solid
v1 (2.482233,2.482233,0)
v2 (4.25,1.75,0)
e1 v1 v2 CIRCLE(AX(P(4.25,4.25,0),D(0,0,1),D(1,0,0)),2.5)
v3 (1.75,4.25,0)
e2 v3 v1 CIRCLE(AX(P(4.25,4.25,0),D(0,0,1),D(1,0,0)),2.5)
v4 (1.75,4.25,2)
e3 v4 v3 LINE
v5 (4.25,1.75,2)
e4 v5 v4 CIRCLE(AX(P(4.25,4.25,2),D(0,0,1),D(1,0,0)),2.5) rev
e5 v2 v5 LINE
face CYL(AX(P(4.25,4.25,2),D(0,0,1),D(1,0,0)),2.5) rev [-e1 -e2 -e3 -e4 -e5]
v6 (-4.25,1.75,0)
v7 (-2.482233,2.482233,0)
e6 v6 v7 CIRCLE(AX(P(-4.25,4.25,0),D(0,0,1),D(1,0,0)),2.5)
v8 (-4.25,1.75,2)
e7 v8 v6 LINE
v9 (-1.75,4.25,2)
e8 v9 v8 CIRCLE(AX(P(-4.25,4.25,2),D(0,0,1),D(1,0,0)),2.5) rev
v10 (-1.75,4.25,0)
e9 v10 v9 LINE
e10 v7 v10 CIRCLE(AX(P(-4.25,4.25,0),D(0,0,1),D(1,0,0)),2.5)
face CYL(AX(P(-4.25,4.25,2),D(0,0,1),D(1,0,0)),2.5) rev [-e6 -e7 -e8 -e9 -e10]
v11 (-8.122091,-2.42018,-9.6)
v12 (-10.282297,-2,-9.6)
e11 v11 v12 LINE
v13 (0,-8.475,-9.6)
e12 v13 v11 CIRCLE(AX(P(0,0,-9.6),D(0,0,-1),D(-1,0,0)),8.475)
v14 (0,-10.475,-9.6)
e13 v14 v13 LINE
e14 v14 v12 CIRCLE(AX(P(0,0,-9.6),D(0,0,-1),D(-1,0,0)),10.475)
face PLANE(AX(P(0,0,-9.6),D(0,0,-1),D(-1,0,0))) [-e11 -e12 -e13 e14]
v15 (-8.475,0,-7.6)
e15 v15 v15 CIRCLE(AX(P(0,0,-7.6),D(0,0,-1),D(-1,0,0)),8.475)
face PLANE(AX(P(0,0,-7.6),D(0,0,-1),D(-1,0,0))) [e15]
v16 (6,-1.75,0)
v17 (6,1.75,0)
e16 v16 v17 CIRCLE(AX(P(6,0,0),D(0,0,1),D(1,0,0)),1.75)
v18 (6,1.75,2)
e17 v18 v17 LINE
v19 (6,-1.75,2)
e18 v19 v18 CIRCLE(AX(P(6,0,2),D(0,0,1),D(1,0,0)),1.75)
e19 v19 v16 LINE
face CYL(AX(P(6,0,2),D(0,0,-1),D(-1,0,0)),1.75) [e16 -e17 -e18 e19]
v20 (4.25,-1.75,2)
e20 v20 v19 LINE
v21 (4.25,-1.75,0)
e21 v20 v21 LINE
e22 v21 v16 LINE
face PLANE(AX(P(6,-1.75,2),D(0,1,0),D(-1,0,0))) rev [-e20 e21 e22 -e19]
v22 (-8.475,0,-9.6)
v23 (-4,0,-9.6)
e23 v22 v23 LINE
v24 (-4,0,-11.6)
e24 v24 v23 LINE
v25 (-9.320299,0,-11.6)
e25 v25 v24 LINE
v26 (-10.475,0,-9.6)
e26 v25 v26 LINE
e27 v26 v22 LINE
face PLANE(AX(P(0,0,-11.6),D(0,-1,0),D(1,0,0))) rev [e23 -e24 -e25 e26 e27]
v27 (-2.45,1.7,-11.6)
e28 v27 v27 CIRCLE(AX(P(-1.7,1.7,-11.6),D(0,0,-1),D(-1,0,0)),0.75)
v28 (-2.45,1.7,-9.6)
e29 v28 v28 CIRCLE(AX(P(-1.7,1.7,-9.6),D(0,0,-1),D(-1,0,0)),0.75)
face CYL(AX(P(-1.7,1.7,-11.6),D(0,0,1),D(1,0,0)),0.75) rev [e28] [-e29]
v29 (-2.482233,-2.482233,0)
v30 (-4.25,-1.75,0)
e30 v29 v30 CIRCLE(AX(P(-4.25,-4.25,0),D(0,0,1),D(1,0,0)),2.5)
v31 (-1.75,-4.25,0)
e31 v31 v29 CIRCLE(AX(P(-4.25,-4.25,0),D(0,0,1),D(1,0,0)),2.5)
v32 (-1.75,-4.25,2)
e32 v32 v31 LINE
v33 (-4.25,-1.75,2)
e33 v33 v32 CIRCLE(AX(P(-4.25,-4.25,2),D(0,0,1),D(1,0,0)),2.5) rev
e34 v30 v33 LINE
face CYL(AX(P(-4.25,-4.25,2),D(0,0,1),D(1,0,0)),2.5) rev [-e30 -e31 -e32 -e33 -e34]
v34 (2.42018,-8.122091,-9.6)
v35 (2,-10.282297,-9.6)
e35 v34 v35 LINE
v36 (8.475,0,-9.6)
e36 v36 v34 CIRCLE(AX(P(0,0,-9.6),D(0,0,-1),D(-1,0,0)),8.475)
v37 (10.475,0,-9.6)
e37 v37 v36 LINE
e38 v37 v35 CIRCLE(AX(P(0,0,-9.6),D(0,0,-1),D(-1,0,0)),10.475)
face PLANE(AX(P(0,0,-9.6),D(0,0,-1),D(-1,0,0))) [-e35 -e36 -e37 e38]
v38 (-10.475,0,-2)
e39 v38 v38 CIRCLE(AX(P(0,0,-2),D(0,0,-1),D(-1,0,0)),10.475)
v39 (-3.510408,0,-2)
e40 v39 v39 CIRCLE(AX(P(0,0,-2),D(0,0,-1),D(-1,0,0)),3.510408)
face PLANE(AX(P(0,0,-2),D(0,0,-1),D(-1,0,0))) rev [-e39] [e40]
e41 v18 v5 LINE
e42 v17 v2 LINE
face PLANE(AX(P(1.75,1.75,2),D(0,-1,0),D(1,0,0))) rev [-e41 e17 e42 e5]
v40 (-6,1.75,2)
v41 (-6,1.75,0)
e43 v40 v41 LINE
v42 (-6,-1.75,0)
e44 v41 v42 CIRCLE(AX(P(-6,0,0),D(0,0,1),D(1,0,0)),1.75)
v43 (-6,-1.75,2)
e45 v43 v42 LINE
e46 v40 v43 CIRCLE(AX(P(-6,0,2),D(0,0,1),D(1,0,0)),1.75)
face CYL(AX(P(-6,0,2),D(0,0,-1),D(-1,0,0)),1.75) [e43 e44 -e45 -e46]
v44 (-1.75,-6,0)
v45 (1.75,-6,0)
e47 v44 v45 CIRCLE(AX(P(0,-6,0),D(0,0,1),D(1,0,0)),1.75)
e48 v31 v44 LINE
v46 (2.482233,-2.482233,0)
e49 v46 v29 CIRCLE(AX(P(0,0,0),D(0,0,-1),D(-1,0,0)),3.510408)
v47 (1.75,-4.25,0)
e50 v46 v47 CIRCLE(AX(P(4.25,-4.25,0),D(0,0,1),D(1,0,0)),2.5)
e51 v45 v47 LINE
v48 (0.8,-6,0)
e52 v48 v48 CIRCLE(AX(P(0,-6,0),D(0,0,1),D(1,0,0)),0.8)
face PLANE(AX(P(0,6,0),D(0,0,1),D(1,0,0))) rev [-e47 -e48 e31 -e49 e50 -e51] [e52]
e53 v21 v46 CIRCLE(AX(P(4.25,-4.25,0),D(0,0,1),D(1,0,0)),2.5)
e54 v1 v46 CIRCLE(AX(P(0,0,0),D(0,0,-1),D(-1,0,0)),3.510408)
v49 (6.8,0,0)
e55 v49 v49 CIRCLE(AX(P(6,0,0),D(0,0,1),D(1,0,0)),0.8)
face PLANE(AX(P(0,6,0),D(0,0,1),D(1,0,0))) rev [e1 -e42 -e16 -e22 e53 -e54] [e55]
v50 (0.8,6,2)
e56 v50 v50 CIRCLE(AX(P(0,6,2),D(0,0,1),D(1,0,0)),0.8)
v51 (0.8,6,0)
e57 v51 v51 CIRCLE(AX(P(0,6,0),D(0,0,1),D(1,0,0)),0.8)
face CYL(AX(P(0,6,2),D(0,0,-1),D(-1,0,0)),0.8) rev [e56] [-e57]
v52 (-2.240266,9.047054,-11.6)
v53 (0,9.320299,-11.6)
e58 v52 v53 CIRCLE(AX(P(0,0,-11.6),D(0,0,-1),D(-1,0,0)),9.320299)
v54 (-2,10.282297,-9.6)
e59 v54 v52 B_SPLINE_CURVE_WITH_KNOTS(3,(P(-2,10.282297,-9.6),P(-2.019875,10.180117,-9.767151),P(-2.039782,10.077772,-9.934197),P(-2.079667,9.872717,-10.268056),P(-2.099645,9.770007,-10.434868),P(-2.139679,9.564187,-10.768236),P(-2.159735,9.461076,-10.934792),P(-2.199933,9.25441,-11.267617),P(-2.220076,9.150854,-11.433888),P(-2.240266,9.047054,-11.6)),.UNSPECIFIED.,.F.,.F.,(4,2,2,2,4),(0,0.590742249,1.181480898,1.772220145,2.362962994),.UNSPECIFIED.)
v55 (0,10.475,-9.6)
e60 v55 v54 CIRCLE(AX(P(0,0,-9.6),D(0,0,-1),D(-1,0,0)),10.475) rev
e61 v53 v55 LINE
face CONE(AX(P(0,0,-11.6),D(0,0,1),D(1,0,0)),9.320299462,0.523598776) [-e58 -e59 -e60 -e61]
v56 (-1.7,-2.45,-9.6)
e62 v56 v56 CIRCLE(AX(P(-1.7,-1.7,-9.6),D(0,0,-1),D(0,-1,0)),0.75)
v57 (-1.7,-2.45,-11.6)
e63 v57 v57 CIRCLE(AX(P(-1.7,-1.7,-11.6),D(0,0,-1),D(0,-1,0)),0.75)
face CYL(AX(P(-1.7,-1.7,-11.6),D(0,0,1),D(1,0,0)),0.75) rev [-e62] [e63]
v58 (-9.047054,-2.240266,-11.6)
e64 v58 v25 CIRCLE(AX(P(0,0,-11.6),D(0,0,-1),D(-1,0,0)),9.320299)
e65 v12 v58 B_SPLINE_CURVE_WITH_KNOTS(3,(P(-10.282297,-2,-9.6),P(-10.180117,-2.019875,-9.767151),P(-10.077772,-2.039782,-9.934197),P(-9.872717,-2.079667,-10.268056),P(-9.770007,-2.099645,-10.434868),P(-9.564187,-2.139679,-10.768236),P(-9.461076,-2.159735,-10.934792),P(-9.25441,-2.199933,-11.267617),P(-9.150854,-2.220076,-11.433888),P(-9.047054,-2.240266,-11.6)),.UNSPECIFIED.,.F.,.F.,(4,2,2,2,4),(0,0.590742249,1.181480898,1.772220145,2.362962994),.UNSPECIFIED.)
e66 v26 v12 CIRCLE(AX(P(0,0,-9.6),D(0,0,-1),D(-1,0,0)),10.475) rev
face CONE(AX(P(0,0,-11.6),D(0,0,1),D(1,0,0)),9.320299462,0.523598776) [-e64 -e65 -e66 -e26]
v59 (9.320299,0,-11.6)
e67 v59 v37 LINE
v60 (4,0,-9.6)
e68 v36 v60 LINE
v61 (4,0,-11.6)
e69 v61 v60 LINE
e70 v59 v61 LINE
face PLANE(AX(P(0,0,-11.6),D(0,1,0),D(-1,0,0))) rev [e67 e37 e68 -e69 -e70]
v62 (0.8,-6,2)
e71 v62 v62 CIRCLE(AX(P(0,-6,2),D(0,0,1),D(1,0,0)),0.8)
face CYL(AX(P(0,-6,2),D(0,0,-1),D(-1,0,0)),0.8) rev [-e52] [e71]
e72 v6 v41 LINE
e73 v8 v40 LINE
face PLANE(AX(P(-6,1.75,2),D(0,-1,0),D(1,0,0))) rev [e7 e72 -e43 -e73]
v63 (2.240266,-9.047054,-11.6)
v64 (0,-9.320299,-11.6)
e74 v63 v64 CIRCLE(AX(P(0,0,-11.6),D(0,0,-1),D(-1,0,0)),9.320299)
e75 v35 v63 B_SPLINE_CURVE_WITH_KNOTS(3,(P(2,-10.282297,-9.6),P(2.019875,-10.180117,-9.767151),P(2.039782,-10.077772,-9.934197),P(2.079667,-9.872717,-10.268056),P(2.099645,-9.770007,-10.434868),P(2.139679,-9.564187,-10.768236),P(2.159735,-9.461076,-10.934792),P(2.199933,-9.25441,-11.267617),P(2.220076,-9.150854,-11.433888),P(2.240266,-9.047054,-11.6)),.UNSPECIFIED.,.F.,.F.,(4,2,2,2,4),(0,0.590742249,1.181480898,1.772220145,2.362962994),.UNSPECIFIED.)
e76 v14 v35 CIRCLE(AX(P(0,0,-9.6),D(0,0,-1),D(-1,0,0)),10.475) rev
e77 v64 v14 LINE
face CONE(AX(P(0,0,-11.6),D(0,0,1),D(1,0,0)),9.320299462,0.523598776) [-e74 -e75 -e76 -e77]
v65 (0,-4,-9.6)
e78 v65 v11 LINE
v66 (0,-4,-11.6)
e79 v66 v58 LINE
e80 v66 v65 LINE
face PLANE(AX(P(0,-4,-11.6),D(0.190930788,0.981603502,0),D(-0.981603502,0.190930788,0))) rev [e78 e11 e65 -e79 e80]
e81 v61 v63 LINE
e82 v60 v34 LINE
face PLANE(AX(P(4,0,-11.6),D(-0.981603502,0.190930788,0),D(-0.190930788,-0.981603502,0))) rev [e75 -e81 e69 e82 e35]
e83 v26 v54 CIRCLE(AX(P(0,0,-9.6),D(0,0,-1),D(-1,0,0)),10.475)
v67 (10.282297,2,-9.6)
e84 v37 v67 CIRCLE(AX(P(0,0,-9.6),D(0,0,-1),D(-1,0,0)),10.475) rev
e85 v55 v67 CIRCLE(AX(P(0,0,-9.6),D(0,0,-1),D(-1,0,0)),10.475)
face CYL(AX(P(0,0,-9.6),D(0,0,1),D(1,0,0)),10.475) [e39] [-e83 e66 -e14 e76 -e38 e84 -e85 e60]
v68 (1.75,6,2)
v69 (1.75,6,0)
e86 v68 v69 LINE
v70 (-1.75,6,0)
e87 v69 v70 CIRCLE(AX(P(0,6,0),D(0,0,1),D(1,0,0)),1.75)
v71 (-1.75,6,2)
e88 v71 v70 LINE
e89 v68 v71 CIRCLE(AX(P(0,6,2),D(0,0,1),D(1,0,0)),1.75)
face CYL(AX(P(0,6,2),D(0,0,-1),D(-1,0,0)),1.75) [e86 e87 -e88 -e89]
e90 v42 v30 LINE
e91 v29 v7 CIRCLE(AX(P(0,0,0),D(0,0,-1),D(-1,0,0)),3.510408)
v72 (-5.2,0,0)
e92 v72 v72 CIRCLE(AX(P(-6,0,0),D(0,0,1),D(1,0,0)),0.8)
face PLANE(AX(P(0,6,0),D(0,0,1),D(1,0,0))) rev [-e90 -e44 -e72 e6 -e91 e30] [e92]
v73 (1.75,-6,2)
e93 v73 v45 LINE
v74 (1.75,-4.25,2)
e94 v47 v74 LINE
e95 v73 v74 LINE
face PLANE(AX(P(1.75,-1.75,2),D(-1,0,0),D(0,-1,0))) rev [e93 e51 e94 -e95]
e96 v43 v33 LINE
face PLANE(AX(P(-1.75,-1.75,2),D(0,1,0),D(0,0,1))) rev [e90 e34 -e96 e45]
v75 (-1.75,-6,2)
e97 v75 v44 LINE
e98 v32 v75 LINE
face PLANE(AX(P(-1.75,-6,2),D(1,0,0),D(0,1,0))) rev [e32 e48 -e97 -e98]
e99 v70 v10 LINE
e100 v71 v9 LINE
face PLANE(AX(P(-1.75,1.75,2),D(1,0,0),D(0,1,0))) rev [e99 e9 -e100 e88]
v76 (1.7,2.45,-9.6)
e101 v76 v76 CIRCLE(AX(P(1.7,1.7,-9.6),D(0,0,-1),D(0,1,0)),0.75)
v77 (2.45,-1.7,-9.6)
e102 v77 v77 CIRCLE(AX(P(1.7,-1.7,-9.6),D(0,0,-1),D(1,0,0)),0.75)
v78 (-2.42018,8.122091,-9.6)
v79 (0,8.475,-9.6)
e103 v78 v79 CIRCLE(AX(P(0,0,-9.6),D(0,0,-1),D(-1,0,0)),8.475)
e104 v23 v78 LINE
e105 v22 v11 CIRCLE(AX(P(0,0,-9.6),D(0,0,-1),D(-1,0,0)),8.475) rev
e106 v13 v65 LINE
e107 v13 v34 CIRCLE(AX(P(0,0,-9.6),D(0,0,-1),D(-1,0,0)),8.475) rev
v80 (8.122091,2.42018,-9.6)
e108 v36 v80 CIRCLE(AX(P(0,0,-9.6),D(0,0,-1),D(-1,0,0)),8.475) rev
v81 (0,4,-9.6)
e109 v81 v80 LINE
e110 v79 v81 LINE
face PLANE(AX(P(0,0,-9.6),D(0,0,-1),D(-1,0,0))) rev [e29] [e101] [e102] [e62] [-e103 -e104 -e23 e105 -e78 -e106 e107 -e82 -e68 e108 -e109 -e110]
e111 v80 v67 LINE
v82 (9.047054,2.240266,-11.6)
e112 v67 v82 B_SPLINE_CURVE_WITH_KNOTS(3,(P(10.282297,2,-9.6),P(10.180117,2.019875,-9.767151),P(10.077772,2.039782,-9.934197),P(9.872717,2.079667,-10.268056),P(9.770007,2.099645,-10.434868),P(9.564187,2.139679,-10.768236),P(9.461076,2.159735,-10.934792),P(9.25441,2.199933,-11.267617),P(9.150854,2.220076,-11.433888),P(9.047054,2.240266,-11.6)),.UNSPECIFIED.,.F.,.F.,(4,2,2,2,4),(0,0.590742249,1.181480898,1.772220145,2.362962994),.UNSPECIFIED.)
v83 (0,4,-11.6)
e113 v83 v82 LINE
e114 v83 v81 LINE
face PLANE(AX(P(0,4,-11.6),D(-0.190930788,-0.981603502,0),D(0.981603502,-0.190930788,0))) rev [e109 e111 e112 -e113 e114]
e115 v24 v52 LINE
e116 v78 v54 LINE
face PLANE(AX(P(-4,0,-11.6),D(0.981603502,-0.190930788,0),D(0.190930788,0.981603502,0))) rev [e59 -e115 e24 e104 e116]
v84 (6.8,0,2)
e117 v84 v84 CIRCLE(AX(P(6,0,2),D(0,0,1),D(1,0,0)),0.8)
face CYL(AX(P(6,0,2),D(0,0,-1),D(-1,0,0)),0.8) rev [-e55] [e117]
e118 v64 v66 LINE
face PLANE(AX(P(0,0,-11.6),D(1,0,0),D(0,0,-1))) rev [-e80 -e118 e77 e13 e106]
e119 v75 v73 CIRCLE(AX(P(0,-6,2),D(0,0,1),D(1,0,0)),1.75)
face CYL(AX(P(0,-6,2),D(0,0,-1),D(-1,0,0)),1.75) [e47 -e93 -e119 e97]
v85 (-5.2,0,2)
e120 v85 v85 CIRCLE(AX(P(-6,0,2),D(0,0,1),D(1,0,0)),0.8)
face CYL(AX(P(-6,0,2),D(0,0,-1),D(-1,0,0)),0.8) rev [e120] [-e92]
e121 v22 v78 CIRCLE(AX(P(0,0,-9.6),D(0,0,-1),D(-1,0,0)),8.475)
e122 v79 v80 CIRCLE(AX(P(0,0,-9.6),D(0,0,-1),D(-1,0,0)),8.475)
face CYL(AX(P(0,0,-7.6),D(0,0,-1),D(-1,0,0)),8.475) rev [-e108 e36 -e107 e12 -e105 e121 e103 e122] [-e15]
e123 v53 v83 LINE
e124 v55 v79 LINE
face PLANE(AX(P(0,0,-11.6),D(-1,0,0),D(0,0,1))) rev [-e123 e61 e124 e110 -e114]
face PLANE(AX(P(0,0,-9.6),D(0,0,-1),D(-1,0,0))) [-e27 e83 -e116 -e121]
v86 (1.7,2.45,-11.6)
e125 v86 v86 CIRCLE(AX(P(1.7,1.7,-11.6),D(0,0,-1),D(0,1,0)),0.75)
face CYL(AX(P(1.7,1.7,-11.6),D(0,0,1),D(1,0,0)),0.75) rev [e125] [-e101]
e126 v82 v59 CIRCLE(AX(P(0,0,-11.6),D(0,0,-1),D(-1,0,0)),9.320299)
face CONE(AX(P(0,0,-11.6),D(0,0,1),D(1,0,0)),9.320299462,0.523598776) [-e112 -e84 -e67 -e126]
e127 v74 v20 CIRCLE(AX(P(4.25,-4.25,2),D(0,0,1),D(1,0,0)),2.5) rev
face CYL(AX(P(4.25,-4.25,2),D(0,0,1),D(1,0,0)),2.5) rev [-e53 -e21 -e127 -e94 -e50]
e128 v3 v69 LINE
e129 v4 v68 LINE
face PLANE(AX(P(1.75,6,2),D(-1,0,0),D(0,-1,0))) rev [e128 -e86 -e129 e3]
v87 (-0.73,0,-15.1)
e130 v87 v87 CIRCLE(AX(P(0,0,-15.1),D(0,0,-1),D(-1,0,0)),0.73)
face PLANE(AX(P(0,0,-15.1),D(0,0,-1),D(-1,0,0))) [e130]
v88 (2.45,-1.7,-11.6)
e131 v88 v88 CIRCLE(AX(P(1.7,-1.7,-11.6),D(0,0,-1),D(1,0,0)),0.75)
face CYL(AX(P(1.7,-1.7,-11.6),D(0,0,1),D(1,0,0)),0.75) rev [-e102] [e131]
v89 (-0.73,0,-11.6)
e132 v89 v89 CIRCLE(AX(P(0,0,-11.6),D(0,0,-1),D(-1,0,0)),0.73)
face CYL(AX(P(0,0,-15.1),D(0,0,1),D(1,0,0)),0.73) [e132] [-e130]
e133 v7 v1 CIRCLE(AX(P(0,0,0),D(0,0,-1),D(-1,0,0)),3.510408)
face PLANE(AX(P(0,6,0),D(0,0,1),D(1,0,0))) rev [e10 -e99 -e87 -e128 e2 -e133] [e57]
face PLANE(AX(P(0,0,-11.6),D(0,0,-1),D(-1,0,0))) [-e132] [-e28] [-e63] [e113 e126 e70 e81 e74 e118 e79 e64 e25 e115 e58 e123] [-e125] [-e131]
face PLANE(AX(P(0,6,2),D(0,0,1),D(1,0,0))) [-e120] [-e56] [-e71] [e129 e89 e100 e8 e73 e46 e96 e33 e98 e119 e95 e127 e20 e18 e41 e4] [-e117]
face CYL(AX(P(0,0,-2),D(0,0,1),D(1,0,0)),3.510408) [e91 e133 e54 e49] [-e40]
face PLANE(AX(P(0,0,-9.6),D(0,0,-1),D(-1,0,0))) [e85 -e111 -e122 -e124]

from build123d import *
from OCP.BRepFilletAPI import BRepFilletAPI_MakeChamfer
from build123d.topology import SkipClean

# Parameters (mm, degrees)
SKETCH1_R                      = 0.8
BOSS_EXTRUDE1_DEPTH            = 2
FILLET2_R                      = 2.5
SKETCH2_R                      = 3.51040764
BOSS_EXTRUDE2_DEPTH            = 2
BOSS_EXTRUDE3_START            = -2
SKETCH3_R                      = 10.475
BOSS_EXTRUDE3_DEPTH            = 7.6
SKETCH4_R                      = 8.475
CUT_EXTRUDE1_DEPTH             = 2
SKETCH5_R                      = 0.75
BOSS_EXTRUDE4_DEPTH            = 2
CHAMFER1_SIZE2                 = 1.154700538
CHAMFER1_SIZE                  = 2
CIRPATTERN2_COUNT              = 4
CHAMFER1_OF_CIRPATTERN2_SIZE   = 2
CHAMFER1_OF_CIRPATTERN2_SIZE_2 = 1.154700538
SKETCH6_R                      = 0.73
BOSS_EXTRUDE5_DEPTH            = 3.5


with BuildPart() as part:
    # Sketch1 → Boss-Extrude1 (new body)
    with BuildSketch(Plane(origin=(0, 0, 0), x_dir=(0, 1, 0), z_dir=(0, 0, 1))):
        with BuildLine():
            Line((-1.75, 1.75), (-1.75, 6))
            ThreePointArc((-1.75, 6), (0, 7.75), (1.75, 6))
            Line((1.75, 6), (1.75, 1.75))
            Line((1.75, 1.75), (6, 1.75))
            ThreePointArc((6, 1.75), (7.75, 0), (6, -1.75))
            Line((6, -1.75), (1.75, -1.75))
            Line((1.75, -1.75), (1.75, -6))
            ThreePointArc((1.75, -6), (0, -7.75), (-1.75, -6))
            Line((-1.75, -6), (-1.75, -1.75))
            Line((-1.75, -1.75), (-6, -1.75))
            ThreePointArc((-6, -1.75), (-7.75, 0), (-6, 1.75))
            Line((-6, 1.75), (-1.75, 1.75))
        make_face()
        with Locations(Location((0, 6, 0), (0, 0, 270))):
            Circle(SKETCH1_R, mode=Mode.SUBTRACT)
        with Locations(Location((6, 0, 0), (0, 0, 270))):
            Circle(SKETCH1_R, mode=Mode.SUBTRACT)
        with Locations(Location((0, -6, 0), (0, 0, 270))):
            Circle(SKETCH1_R, mode=Mode.SUBTRACT)
        with Locations(Location((-6, 0, 0), (0, 0, 270))):
            Circle(SKETCH1_R, mode=Mode.SUBTRACT)
    extrude(amount=BOSS_EXTRUDE1_DEPTH)

    # Fillet2
    fillet2_edges = [part.edges().sort_by_distance(p)[0] for p in [
        (1.75, 1.75, 1),
        (1.75, -1.75, 1),
        (-1.75, -1.75, 1),
        (-1.75, 1.75, 1),
    ]]
    fillet(fillet2_edges, radius=FILLET2_R)

    # Sketch2 → Boss-Extrude2 (add)
    with BuildSketch(Plane(origin=(0, 0, 0), x_dir=(1, 0, 0), z_dir=(0, 0, -1))):
        with Locations(Location((0, 0, 0), (0, 0, 45))):
            Circle(SKETCH2_R)
    extrude(amount=BOSS_EXTRUDE2_DEPTH)

    # Sketch3 → Boss-Extrude3 (add)
    with BuildSketch(Plane(origin=(0, 0, 0), x_dir=(0, 1, 0), z_dir=(0, 0, 1)).offset(BOSS_EXTRUDE3_START)):
        with Locations(Location((0, 0, 0), (0, 0, 270))):
            Circle(SKETCH3_R)
    extrude(amount=-BOSS_EXTRUDE3_DEPTH)

    # Sketch4 → Cut-Extrude1 (cut)
    with BuildSketch(Plane(origin=(0, 0, -9.6), x_dir=(1, 0, 0), z_dir=(0, 0, -1))):
        with Locations(Location((0, 0, 0), (0, 0, 180))):
            Circle(SKETCH4_R)
    extrude(amount=-CUT_EXTRUDE1_DEPTH, mode=Mode.SUBTRACT)

    # Sketch5 → Boss-Extrude4 (add)
    with BuildSketch(Plane(origin=(0, 0, -9.6), x_dir=(1, 0, 0), z_dir=(0, 0, -1))):
        with BuildLine():
            Line((0, 0), (-4, 0))
            Line((-4, 0), (-2, -10.282296679))
            ThreePointArc((-2, -10.282296679), (-1.004631098, -10.426712874), (0, -10.475))
            Line((0, -10.475), (0, 0))
        make_face()
        with Locations(Location((-1.7, -1.7, 0), (0, 0, 180))):
            Circle(SKETCH5_R, mode=Mode.SUBTRACT)
    boss_extrude4 = extrude(amount=BOSS_EXTRUDE4_DEPTH)

    # Chamfer1
    chamfer1_edges = [part.edges().sort_by_distance(p)[0] for p in [
        (-1.004631098, 10.426712874, -11.6),
    ]]
    chamfer1_side = [part.faces().sort_by_distance(p)[0] for p in [
        (-1.004631098, 10.426712874, -11.576905989),
    ]]
    chamfer(chamfer1_edges, length=CHAMFER1_SIZE - 0.0001, length2=CHAMFER1_SIZE2 - 0.0001, reference=chamfer1_side[0])  # a hair under: the kernel refuses the full size

    # CirPattern2: Boss-Extrude4 ×4 about axis
    with SkipClean():  # the faces are left unmerged after this step: merging them gives an invalid solid
        cirpattern2_axis = Axis((0, 0, 0), (0, 0, 1))
        for i in range(1, CIRPATTERN2_COUNT):
            add(boss_extrude4.rotate(cirpattern2_axis, i * 360 / CIRPATTERN2_COUNT))

    # Chamfer1 of CirPattern2
    chamfer1_of_cirpattern2_edges_1 = [part.edges().sort_by_distance(p)[0] for p in [
        (-10.426712874, -1.004631098, -11.6),
    ]]
    chamfer1_of_cirpattern2_side_1 = [part.faces().sort_by_distance(p)[0] for p in [
        (-10.426712874, -1.004631098, -11.576905989),
    ]]
    chamfer1_of_cirpattern2_edges_2 = [part.edges().sort_by_distance(p)[0] for p in [
        (1.004631098, -10.426712874, -11.6),
    ]]
    chamfer1_of_cirpattern2_side_2 = [part.faces().sort_by_distance(p)[0] for p in [
        (1.004631098, -10.426712874, -11.576905989),
    ]]
    chamfer1_of_cirpattern2_edges_3 = [part.edges().sort_by_distance(p)[0] for p in [
        (10.426712874, 1.004631098, -11.6),
    ]]
    chamfer1_of_cirpattern2_side_3 = [part.faces().sort_by_distance(p)[0] for p in [
        (10.426712874, 1.004631098, -11.576905989),
    ]]
    chamfer1_of_cirpattern2 = BRepFilletAPI_MakeChamfer(part.part.solid().wrapped)
    for e in chamfer1_of_cirpattern2_edges_1:
        chamfer1_of_cirpattern2.Add(CHAMFER1_OF_CIRPATTERN2_SIZE - 0.0001, CHAMFER1_OF_CIRPATTERN2_SIZE_2 - 0.0001, e.wrapped, chamfer1_of_cirpattern2_side_1[0].wrapped)
    for e in chamfer1_of_cirpattern2_edges_2:
        chamfer1_of_cirpattern2.Add(CHAMFER1_OF_CIRPATTERN2_SIZE - 0.0001, CHAMFER1_OF_CIRPATTERN2_SIZE_2 - 0.0001, e.wrapped, chamfer1_of_cirpattern2_side_2[0].wrapped)
    for e in chamfer1_of_cirpattern2_edges_3:
        chamfer1_of_cirpattern2.Add(CHAMFER1_OF_CIRPATTERN2_SIZE - 0.0001, CHAMFER1_OF_CIRPATTERN2_SIZE_2 - 0.0001, e.wrapped, chamfer1_of_cirpattern2_side_3[0].wrapped)
    add(Compound.cast(chamfer1_of_cirpattern2.Shape()), mode=Mode.REPLACE)  # a hair under: the kernel refuses the full size

    # Sketch6 → Boss-Extrude5 (add)
    with BuildSketch(Plane(origin=(0, 0, -11.6), x_dir=(1, 0, 0), z_dir=(0, 0, -1))):
        with Locations(Location((0, 0, 0), (0, 0, 180))):
            Circle(SKETCH6_R)
    extrude(amount=BOSS_EXTRUDE5_DEPTH)


solid = part.part
